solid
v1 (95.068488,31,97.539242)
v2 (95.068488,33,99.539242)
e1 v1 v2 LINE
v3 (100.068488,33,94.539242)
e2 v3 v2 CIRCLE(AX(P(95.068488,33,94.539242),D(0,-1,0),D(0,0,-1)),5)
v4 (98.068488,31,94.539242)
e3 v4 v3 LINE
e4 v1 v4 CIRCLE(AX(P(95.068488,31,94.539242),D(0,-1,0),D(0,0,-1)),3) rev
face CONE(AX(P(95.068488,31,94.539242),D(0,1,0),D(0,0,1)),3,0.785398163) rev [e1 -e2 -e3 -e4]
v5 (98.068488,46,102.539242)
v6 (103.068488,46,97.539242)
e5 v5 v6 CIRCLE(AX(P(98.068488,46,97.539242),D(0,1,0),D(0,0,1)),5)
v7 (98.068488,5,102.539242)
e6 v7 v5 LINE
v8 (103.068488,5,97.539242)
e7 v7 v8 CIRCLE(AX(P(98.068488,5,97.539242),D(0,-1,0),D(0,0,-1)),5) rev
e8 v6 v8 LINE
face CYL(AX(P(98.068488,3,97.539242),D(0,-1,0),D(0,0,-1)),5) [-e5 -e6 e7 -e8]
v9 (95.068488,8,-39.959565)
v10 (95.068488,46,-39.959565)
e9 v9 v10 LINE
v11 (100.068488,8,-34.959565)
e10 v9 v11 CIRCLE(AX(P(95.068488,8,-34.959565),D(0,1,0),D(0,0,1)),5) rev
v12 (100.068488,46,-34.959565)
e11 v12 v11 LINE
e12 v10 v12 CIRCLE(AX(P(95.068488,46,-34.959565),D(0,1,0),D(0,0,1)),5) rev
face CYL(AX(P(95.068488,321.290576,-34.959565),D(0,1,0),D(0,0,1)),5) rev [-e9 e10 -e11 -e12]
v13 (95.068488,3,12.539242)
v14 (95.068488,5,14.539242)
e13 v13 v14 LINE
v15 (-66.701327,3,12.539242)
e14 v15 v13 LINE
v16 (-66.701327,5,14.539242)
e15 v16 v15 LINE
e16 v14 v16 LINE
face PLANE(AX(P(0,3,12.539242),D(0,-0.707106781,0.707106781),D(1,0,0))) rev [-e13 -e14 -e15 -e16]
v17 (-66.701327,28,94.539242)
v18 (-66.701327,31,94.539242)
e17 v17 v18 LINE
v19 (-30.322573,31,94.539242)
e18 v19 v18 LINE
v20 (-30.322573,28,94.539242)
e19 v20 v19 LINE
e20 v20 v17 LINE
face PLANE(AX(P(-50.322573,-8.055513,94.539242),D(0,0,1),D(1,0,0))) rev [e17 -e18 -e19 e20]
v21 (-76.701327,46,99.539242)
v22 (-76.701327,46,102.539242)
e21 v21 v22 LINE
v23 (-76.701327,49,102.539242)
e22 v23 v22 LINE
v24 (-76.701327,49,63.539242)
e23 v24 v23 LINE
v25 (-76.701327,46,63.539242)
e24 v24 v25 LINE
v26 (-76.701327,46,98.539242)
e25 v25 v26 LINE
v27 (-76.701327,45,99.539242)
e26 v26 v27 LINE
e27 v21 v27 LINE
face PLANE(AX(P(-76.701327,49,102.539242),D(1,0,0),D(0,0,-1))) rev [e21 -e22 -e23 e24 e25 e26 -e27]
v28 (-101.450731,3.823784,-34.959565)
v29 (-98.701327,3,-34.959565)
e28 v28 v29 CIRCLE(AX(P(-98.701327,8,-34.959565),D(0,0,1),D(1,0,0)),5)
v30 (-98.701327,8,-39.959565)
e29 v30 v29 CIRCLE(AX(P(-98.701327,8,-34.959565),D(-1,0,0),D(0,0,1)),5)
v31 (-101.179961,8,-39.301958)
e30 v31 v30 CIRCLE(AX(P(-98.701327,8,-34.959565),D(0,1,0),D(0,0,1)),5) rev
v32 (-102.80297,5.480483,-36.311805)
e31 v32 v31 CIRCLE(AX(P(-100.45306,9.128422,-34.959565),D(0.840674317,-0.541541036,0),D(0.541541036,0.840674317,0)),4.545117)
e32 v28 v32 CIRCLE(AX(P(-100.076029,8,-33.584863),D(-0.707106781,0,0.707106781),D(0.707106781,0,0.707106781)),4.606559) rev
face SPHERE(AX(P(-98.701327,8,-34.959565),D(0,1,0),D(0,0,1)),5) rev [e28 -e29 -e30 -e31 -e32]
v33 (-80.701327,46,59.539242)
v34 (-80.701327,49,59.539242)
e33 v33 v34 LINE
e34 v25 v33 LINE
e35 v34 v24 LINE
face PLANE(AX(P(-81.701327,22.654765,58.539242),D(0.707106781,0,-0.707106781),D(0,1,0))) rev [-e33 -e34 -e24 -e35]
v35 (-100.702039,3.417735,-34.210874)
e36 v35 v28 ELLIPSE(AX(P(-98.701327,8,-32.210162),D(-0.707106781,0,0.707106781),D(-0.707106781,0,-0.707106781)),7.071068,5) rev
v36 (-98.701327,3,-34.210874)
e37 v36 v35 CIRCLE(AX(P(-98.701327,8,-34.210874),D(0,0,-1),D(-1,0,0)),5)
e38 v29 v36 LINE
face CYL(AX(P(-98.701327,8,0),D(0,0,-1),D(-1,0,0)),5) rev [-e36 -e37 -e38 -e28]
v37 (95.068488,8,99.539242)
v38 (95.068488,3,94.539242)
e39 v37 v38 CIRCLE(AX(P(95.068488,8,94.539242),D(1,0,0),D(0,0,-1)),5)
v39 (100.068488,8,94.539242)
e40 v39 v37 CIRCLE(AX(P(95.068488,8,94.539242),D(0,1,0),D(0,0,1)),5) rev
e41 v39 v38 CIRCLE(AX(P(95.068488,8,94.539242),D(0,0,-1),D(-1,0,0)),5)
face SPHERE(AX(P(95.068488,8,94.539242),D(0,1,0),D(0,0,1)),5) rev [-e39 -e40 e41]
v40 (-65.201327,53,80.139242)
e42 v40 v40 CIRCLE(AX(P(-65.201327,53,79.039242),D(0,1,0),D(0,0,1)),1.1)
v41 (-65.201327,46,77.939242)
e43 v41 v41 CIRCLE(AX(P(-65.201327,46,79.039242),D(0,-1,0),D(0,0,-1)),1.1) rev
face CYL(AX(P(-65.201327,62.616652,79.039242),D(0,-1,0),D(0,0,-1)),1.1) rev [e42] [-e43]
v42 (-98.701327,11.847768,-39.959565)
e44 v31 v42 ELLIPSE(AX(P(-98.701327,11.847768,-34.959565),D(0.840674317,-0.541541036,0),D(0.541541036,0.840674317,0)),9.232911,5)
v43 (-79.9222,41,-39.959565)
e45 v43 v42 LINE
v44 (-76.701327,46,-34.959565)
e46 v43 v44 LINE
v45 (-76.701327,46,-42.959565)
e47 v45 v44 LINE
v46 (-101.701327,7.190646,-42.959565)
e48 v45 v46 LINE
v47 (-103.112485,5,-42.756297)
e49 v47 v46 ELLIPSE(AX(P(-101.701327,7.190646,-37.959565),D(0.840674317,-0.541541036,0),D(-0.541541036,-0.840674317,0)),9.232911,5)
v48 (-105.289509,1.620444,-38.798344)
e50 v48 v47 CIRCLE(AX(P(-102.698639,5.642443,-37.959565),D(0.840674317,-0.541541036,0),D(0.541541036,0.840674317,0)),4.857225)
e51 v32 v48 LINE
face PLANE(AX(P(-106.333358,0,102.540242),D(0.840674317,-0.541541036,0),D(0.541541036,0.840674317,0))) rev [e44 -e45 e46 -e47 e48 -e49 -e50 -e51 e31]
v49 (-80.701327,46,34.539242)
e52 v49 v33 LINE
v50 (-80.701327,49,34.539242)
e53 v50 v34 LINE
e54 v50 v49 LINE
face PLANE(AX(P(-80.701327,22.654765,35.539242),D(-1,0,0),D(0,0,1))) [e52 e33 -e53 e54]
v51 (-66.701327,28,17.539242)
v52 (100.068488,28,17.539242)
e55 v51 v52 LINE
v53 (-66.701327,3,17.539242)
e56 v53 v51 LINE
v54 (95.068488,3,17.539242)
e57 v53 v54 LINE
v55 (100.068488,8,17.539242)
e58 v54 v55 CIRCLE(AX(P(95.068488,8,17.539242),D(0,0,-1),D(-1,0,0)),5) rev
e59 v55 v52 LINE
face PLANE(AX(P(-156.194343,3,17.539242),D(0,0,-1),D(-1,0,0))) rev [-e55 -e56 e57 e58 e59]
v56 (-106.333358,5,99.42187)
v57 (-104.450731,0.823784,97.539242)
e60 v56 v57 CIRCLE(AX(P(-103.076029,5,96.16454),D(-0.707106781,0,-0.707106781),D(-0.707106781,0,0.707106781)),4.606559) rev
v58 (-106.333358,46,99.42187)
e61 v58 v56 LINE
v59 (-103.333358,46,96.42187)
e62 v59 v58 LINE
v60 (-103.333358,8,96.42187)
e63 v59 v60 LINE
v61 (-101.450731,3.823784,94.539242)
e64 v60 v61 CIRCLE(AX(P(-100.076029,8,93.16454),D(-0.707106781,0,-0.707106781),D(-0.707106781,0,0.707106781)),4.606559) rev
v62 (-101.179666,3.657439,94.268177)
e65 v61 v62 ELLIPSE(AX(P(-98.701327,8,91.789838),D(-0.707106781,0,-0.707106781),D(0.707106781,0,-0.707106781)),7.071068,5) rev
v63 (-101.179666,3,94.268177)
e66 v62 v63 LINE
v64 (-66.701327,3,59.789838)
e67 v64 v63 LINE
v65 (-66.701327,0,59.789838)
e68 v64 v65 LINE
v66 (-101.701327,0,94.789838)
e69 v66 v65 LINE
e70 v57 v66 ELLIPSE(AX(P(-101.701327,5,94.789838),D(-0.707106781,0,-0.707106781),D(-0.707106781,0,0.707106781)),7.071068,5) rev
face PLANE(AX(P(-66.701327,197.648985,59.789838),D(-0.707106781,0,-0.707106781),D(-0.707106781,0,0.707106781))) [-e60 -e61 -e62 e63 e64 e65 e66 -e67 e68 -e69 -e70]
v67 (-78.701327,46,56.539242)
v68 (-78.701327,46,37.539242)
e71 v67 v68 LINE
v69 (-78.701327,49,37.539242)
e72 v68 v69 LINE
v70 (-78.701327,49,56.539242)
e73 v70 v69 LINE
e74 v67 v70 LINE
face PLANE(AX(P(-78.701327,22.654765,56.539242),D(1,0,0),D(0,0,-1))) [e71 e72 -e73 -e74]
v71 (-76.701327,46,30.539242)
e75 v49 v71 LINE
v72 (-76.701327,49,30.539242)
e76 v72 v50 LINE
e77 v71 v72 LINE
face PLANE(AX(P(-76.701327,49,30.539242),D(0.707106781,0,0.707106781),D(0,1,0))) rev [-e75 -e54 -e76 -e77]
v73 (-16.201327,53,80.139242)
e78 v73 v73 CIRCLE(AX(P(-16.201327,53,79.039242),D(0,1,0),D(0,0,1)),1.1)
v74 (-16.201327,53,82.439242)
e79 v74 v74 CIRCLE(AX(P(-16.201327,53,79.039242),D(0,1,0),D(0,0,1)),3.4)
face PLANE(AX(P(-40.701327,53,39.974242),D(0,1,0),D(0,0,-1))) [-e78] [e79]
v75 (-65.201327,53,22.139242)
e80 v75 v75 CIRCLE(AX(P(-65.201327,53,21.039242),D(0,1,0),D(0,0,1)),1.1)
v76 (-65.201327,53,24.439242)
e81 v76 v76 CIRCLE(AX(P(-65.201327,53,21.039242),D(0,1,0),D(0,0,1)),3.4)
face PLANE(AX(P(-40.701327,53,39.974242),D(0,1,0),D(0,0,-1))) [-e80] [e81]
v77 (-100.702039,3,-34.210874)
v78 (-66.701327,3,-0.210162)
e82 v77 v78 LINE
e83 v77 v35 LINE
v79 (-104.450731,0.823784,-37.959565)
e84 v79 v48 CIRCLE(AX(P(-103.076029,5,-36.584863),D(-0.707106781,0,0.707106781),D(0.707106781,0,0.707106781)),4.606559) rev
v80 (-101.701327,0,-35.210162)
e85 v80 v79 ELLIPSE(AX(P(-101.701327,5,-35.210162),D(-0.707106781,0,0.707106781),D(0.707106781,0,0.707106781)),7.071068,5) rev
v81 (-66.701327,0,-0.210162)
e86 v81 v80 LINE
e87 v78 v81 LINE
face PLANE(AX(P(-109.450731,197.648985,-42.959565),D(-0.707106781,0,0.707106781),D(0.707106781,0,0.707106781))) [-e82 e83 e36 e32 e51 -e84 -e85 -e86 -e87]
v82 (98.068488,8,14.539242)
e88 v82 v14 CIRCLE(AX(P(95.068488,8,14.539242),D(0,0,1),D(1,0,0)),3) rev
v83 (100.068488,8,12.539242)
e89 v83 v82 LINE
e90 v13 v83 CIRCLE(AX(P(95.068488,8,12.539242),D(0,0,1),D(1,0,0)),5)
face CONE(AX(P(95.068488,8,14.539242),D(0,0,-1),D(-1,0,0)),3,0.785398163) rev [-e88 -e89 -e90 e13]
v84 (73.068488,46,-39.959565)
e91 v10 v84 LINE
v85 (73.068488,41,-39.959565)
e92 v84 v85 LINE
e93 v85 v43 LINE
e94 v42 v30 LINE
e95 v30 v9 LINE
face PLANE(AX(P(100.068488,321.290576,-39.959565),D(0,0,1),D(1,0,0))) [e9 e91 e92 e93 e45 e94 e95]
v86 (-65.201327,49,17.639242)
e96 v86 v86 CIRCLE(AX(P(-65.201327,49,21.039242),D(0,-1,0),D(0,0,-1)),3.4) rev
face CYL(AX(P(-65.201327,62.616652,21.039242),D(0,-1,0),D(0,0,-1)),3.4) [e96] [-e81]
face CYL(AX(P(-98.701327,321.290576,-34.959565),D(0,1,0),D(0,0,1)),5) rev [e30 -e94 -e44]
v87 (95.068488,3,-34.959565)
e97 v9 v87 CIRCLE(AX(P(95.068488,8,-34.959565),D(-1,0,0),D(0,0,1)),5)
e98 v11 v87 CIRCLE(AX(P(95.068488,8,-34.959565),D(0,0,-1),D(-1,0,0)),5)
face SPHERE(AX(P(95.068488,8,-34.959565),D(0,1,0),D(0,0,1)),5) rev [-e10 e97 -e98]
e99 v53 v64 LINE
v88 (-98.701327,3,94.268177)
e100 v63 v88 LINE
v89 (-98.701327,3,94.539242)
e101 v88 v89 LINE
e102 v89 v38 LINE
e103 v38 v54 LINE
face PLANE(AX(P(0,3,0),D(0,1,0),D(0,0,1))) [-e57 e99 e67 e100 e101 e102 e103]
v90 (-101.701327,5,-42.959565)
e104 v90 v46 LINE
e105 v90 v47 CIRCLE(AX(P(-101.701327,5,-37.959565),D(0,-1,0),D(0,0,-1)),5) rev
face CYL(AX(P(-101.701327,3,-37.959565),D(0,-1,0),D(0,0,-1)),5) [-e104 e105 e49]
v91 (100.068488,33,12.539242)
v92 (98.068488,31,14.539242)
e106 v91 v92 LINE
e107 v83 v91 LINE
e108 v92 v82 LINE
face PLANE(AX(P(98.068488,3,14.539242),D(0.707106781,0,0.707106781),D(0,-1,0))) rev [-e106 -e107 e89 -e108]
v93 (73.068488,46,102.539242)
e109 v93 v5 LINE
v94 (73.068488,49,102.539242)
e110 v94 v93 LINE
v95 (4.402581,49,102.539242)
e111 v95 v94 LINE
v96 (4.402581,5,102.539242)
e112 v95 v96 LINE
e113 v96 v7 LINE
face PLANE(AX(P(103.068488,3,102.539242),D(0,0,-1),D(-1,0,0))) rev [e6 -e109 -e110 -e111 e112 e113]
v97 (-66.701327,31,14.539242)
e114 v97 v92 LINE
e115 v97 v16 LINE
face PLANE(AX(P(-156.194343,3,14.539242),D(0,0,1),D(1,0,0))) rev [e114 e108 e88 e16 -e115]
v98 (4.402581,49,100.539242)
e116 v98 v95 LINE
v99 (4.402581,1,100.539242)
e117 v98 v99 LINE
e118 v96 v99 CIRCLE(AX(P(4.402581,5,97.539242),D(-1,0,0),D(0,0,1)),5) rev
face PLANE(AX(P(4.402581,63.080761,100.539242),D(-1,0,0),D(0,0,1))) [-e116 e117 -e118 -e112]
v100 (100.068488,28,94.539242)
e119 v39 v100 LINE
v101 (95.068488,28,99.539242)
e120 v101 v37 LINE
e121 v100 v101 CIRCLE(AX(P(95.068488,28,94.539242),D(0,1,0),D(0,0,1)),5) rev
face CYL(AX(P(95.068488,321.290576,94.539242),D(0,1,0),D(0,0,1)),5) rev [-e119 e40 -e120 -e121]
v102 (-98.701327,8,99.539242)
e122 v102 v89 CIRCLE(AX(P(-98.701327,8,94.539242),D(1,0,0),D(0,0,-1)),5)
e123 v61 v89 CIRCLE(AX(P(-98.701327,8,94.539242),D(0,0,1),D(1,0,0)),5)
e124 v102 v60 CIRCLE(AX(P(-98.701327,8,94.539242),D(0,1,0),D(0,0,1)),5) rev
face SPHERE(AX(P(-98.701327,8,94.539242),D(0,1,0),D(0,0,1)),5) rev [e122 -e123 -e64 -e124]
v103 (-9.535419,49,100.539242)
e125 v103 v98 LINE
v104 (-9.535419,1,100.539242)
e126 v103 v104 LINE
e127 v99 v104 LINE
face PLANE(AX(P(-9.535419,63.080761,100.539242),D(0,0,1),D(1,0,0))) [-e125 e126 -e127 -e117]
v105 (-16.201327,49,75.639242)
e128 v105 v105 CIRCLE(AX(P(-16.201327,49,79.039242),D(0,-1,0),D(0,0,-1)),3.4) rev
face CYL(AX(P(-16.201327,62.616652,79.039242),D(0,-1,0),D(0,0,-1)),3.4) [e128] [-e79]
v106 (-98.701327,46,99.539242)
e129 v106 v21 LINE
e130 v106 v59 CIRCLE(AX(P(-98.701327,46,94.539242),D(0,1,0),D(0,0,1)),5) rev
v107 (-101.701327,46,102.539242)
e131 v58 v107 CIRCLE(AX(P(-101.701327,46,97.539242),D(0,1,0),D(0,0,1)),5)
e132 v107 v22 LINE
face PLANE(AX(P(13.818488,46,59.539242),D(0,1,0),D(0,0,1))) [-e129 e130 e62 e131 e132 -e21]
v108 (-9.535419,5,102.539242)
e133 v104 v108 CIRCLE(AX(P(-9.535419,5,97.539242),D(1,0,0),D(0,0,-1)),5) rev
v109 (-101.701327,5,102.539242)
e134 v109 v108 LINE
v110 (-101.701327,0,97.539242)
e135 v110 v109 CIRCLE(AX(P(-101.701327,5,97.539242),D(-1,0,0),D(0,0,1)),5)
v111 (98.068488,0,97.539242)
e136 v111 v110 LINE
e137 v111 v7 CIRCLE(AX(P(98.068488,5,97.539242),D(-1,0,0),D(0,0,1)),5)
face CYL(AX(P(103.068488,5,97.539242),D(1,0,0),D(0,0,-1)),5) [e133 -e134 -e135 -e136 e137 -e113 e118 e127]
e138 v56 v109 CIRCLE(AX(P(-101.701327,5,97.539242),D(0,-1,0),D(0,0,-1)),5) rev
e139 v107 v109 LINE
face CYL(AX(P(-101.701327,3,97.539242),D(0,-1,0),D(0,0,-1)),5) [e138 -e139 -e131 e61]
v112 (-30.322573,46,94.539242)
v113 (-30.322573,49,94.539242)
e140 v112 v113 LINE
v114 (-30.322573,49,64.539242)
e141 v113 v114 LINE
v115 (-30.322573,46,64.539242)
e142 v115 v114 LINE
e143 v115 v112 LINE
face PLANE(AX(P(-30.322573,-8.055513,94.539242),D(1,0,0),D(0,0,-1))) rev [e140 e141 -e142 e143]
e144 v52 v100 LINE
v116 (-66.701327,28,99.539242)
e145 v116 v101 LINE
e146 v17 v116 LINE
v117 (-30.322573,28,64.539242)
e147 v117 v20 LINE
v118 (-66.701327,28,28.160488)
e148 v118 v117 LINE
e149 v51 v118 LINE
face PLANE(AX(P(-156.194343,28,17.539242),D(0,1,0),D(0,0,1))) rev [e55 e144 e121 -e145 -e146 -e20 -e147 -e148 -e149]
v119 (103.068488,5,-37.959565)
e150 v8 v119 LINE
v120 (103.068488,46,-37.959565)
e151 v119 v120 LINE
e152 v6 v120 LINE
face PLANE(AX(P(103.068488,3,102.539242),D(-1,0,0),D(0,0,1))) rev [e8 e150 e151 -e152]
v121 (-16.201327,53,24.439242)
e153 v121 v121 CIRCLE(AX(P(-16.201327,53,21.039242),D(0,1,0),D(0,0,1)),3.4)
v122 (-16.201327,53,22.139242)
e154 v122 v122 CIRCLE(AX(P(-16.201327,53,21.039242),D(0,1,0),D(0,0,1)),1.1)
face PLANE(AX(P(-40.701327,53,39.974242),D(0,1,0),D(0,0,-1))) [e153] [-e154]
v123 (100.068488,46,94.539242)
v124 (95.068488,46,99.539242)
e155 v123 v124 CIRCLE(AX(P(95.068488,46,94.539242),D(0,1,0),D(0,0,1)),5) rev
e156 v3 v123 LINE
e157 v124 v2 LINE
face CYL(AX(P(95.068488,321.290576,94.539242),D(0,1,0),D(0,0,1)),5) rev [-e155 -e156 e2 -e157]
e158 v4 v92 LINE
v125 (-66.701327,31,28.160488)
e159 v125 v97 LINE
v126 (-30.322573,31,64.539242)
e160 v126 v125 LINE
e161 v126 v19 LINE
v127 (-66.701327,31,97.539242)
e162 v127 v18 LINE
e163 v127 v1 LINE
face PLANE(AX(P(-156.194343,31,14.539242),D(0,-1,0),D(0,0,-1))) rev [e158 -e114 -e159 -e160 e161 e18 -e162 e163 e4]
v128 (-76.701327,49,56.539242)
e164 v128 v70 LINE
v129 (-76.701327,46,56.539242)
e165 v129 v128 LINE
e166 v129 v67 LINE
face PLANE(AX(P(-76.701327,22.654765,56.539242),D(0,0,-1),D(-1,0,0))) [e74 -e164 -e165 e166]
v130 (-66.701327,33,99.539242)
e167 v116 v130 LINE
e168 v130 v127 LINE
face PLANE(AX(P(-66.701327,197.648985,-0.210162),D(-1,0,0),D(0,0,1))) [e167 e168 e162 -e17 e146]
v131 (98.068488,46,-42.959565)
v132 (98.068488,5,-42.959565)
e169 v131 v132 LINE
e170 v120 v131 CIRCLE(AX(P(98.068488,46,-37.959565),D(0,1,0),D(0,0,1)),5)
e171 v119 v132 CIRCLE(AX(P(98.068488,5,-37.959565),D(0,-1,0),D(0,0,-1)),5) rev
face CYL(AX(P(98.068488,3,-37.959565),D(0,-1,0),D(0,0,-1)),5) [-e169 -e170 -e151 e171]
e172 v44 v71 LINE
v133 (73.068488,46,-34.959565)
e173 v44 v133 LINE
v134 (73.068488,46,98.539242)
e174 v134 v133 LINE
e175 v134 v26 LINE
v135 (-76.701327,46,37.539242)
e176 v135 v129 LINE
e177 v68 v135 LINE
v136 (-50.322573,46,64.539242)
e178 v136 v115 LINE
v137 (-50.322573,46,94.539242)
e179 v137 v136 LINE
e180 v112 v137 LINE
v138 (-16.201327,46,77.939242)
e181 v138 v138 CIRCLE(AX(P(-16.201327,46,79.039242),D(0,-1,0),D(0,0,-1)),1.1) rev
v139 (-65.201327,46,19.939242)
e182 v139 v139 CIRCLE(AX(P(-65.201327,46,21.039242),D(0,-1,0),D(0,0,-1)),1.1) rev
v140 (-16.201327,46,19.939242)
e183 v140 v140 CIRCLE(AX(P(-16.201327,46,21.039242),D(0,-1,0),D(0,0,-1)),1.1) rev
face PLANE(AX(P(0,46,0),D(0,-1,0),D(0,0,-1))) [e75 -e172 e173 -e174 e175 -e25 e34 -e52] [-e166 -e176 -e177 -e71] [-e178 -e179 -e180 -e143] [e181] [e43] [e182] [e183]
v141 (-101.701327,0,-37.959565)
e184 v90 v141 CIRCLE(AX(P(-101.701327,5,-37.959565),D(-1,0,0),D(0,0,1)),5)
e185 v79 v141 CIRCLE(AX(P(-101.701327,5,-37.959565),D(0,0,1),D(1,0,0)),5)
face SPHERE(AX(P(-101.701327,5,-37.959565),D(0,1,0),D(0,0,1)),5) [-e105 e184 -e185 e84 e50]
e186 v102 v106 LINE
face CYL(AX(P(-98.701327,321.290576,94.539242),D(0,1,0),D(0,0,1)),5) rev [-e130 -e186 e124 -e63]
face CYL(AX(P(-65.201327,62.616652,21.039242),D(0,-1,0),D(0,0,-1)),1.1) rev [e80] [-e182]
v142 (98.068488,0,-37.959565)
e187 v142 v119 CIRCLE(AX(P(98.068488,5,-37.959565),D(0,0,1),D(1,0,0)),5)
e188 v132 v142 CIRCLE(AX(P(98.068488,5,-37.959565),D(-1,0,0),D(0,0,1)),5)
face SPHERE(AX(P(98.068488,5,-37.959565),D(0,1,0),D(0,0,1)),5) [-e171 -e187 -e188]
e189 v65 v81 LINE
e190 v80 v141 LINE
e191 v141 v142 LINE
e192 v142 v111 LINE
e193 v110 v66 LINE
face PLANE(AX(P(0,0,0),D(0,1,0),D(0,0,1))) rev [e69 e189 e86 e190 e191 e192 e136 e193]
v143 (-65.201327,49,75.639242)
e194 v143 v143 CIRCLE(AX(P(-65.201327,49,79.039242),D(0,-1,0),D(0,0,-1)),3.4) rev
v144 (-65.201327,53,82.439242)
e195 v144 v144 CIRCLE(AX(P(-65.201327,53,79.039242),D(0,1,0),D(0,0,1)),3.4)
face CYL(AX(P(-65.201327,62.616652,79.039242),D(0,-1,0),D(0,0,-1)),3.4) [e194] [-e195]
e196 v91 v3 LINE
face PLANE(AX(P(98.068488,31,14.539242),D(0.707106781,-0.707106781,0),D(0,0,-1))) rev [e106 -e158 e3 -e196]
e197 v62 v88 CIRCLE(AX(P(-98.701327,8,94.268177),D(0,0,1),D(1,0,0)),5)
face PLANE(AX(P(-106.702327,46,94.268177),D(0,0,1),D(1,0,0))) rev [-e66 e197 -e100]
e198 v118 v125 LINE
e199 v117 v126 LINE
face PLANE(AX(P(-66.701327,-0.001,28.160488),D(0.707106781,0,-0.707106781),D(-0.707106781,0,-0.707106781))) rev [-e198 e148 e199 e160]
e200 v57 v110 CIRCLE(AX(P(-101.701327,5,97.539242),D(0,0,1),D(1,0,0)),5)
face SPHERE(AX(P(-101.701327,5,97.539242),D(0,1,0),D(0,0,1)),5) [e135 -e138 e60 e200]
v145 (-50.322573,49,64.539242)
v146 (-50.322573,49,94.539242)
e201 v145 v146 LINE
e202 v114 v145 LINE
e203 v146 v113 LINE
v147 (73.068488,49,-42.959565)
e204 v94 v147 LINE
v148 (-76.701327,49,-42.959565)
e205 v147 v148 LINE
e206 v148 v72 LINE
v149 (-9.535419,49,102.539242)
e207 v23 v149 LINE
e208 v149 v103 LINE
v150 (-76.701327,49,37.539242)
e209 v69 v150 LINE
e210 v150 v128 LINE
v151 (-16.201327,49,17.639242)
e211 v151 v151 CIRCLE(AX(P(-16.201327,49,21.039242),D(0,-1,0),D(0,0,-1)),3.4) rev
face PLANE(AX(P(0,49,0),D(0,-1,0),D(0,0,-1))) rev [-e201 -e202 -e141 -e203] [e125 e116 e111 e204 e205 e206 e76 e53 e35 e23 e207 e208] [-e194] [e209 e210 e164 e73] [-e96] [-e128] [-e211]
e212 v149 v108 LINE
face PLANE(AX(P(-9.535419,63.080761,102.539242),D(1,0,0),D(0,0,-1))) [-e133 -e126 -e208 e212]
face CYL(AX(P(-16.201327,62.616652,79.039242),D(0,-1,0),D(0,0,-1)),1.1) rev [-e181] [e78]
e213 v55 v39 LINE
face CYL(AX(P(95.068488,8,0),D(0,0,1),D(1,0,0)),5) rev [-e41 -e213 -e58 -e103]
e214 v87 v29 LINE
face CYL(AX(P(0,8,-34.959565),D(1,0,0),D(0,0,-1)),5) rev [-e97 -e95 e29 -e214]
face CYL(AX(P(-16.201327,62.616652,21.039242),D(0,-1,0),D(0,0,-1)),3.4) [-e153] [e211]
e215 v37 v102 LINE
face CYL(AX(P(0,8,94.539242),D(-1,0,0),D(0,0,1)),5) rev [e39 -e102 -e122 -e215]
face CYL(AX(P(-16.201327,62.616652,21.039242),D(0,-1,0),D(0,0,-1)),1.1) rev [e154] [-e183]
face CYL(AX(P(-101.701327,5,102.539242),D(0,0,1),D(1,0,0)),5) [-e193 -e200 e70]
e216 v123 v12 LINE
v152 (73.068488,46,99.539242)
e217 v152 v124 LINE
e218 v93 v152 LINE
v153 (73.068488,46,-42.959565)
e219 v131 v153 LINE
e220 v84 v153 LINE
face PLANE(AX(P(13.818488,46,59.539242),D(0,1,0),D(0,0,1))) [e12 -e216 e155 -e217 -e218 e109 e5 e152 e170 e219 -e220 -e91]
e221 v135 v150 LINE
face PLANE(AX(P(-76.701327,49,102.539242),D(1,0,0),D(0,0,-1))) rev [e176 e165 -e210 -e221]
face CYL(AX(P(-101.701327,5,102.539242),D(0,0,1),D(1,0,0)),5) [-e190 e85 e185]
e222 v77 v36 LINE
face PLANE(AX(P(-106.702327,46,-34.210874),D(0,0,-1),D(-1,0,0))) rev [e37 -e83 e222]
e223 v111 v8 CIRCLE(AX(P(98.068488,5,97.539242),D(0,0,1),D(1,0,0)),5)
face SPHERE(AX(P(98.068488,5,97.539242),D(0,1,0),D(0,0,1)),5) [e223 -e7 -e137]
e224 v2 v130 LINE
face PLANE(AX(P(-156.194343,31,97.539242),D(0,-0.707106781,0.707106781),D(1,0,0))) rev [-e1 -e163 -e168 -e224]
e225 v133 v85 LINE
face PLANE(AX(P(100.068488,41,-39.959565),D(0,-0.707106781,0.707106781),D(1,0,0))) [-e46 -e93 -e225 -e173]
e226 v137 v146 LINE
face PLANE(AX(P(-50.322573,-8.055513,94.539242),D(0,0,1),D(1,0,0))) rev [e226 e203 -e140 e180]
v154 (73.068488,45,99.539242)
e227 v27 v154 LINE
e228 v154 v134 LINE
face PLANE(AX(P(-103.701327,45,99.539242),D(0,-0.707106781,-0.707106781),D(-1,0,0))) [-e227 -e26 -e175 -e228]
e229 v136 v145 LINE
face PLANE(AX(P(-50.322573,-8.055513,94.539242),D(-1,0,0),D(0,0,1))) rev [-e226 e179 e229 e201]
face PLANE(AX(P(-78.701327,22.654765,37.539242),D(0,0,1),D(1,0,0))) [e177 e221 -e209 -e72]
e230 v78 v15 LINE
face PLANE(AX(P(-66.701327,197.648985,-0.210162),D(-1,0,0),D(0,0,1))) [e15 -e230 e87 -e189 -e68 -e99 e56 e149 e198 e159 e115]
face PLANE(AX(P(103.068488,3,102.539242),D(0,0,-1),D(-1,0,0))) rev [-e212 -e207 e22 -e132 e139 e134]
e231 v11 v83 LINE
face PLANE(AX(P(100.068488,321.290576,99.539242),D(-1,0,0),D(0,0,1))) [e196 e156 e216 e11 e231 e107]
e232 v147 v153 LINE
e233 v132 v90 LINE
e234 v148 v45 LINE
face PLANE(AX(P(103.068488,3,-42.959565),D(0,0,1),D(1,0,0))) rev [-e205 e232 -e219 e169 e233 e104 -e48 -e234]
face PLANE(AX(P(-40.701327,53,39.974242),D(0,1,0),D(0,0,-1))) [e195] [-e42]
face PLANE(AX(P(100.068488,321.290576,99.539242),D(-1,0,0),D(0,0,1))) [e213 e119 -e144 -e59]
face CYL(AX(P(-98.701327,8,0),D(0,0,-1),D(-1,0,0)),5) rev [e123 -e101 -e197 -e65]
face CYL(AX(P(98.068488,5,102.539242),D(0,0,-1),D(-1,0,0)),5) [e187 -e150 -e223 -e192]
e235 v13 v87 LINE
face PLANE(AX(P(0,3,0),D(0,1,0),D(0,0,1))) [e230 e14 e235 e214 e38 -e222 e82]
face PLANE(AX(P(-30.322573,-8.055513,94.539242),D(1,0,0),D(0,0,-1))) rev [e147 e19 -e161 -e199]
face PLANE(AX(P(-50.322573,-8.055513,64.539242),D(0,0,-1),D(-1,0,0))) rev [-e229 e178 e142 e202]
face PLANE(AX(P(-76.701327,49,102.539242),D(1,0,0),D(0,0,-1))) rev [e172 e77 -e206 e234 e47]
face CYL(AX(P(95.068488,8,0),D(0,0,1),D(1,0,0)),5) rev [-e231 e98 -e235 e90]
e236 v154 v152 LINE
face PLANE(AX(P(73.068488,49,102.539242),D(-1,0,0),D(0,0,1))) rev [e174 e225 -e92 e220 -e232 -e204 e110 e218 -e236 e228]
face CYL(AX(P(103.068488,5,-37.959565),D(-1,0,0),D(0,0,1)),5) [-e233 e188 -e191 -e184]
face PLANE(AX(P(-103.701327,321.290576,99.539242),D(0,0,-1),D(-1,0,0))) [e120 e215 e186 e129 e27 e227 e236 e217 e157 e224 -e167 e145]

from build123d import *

# Parameters (mm, degrees)
SKETCH1_W           = 209.76981502
SKETCH1_H           = 145.49880751
BOSS_EXTRUDE1_DEPTH = 3
SKETCH2_W           = 209.76981502
SKETCH2_H           = 145.49880751
SKETCH2_W_2         = 203.76981502
SKETCH2_H_2         = 139.49880751
BOSS_EXTRUDE2_DEPTH = 43
CUT_EXTRUDE1_REACH  = 237.338
SKETCH3_W           = 128.479051628
SKETCH3_H           = 43
FILLET1_R           = 5
FILLET2_R           = 5
SKETCH4_W           = 149.76981502
SKETCH4_H           = 145.49880751
BOSS_EXTRUDE3_DEPTH = 3
SKETCH6_R           = 3.4
SKETCH6_R_2         = 1.1
BOSS_EXTRUDE4_DEPTH = 4
CUT_EXTRUDE3_REACH  = 159.189
CUT_EXTRUDE4_REACH  = 157.634
SKETCH6_3_R         = 1.1
SKETCH10_W          = 13.938
SKETCH10_H          = 2
CUT_EXTRUDE7_DEPTH  = 49
BOSS_EXTRUDE7_DEPTH = 3
CHAMFER2_SIZE       = 5
BOSS_EXTRUDE8_DEPTH = 166.769815019
CUT_EXTRUDE8_REACH  = 189.845
CHAMFER3_SIZE       = 5
CHAMFER4_SIZE       = 1
CUT_EXTRUDE9_REACH  = 157.634
SKETCH14_W          = 20
SKETCH14_H          = 30
CHAMFER5_SIZE       = 2
CUT_EXTRUDE11_REACH = 152.937


with BuildPart() as part:
    # Sketch1 → Boss-Extrude1 (new body)
    with BuildSketch(Plane(origin=(0, 0, 0), x_dir=(1, 0, 0), z_dir=(0, 1, 0))):
        with Locations((-1.81641925, -29.789838466)):
            Rectangle(SKETCH1_W, SKETCH1_H)
    extrude(amount=BOSS_EXTRUDE1_DEPTH)

    # Sketch2 → Boss-Extrude2 (add)
    with BuildSketch(Plane(origin=(0, 3, 0), x_dir=(1, 0, 0), z_dir=(0, 1, 0))):
        with Locations((-1.81641925, -29.789838466)):
            Rectangle(SKETCH2_W, SKETCH2_H)
        with Locations((-1.81641925, -29.789838466)):
            Rectangle(SKETCH2_W_2, SKETCH2_H_2, mode=Mode.SUBTRACT)
    extrude(amount=BOSS_EXTRUDE2_DEPTH)

    # Sketch3 → Cut-Extrude1 (cut, up to next)
    with BuildSketch(Plane(origin=(-103.70132676, 0, 0), x_dir=(0, 0, -1), z_dir=(1, 0, 0)), mode=Mode.PRIVATE) as cut_extrude1_sk1:
        with Locations((-30.028651676, 24.5)):
            Rectangle(SKETCH3_W, SKETCH3_H)
    cut_extrude1_tool1 = extrude(cut_extrude1_sk1.sketch, amount=-CUT_EXTRUDE1_REACH, mode=Mode.PRIVATE) & part.part
    add(cut_extrude1_tool1.solids().sort_by_distance((-103.701327, 24.5, 30.028652))[0], mode=Mode.SUBTRACT)

    # Fillet1
    fillet1_edges = [part.edges().sort_by_distance(p)[0] for p in [
        (100.06848826, 24.5, -39.959565289),
        (100.06848826, 24.5, 99.539242221),
        (-103.70132676, 24.5, 99.539242221),
        (-103.70132676, 24.5, -39.959565289),
        (-106.70132676, 23, -42.959565289),
        (103.06848826, 23, -42.959565289),
        (103.06848826, 23, 102.539242221),
        (-106.70132676, 23, 102.539242221),
    ]]
    fillet(fillet1_edges, radius=FILLET1_R)

    # Fillet2
    # the kernel refuses this fillet: 5 mm, written as the material it adds along each edge
    with BuildSketch(Plane(origin=(-103.70132676, 3, 94.26817749), x_dir=(0, 1, 0), z_dir=(0, 0, 1))) as fillet2_piece_1:
        with BuildLine():
            CenterArc((FILLET2_R, -FILLET2_R), FILLET2_R, 90, 90)
            Line((0, -FILLET2_R), (0, 0))
            Line((0, 0), (FILLET2_R, 0))
        make_face()
    extrude(amount=0.271064731)
    with BuildSketch(Plane(origin=(-98.70132676, 3, 94.539242221), x_dir=(-1, 0, 0), z_dir=(0, 0, -1))) as fillet2_piece_2:
        with BuildLine():
            CenterArc((5 - FILLET2_R, FILLET2_R), FILLET2_R, 270, 90)
            Line((5 - FILLET2_R, 0), (5, 0))
            Line((5, 0), (5, FILLET2_R))
        make_face()
    revolve(axis=Axis((-98.70132676, 3, 94.539242221), (0, 1, 0)), revolution_arc=90)
    with BuildSketch(Plane(origin=(-98.70132676, 3, 99.539242221), x_dir=(0, 1, 0), z_dir=(1, 0, 0)), Plane(origin=(95.06848826, 3, -39.959565289), x_dir=(0, 1, 0), z_dir=(-1, 0, 0))) as fillet2_piece_3:
        with BuildLine():
            CenterArc((FILLET2_R, -FILLET2_R), FILLET2_R, 90, 90)
            Line((0, -FILLET2_R), (0, 0))
            Line((0, 0), (FILLET2_R, 0))
        make_face()
    extrude(amount=193.769815019)
    with BuildSketch(Plane(origin=(95.06848826, 3, 94.539242221), x_dir=(0, 0, 1), z_dir=(-1, 0, 0))) as fillet2_piece_4:
        with BuildLine():
            CenterArc((5 - FILLET2_R, FILLET2_R), FILLET2_R, 270, 90)
            Line((5 - FILLET2_R, 0), (5, 0))
            Line((5, 0), (5, FILLET2_R))
        make_face()
    revolve(axis=Axis((95.06848826, 3, 94.539242221), (0, 1, 0)), revolution_arc=90)
    with BuildSketch(Plane(origin=(100.06848826, 3, 94.539242221), x_dir=(0, 1, 0), z_dir=(0, 0, -1))) as fillet2_piece_5:
        with BuildLine():
            CenterArc((FILLET2_R, -FILLET2_R), FILLET2_R, 90, 90)
            Line((0, -FILLET2_R), (0, 0))
            Line((0, 0), (FILLET2_R, 0))
        make_face()
    extrude(amount=129.49880751)
    with BuildSketch(Plane(origin=(95.06848826, 3, -34.959565289), x_dir=(1, 0, 0), z_dir=(0, 0, 1))) as fillet2_piece_6:
        with BuildLine():
            CenterArc((5 - FILLET2_R, FILLET2_R), FILLET2_R, 270, 90)
            Line((5 - FILLET2_R, 0), (5, 0))
            Line((5, 0), (5, FILLET2_R))
        make_face()
    revolve(axis=Axis((95.06848826, 3, -34.959565289), (0, 1, 0)), revolution_arc=90)
    with BuildSketch(Plane(origin=(-103.70132676, 3, -34.959565289), x_dir=(0, 1, 0), z_dir=(0, 0, 1))) as fillet2_piece_7:
        with BuildLine():
            CenterArc((FILLET2_R, -FILLET2_R), FILLET2_R, 90, 90)
            Line((0, -FILLET2_R), (0, 0))
            Line((0, 0), (FILLET2_R, 0))
        make_face()
    extrude(amount=0.748691151)
    with BuildSketch(Plane(origin=(-98.70132676, 3, -34.959565289), x_dir=(0, 0, -1), z_dir=(1, 0, 0))) as fillet2_piece_8:
        with BuildLine():
            CenterArc((5 - FILLET2_R, FILLET2_R), FILLET2_R, 270, 90)
            Line((5 - FILLET2_R, 0), (5, 0))
            Line((5, 0), (5, FILLET2_R))
        make_face()
    revolve(axis=Axis((-98.70132676, 3, -34.959565289), (0, 1, 0)), revolution_arc=90)
    # the kernel refuses this fillet: 5 mm, written as the material it takes off along each edge
    with BuildSketch(Plane(origin=(-101.70132676, 0, 97.539242221), x_dir=(0, 0, 1), z_dir=(1, 0, 0))) as fillet2_2_piece_1:
        with BuildLine():
            CenterArc((5 - FILLET2_R, -FILLET2_R), FILLET2_R, 0, 90)
            Line((5, -FILLET2_R), (5, 0))
            Line((5, 0), (5 - FILLET2_R, 0))
        make_face()
    revolve(axis=Axis((-101.70132676, 0, 97.539242221), (0, -1, 0)), revolution_arc=90, mode=Mode.SUBTRACT)
    with BuildSketch(Plane(origin=(-106.70132676, 0, 97.539242221), x_dir=(1, 0, 0), z_dir=(0, 0, -1)), Plane(origin=(103.06848826, 0, -37.959565289), x_dir=(-1, 0, 0), z_dir=(0, 0, 1))) as fillet2_2_piece_2:
        with BuildLine():
            CenterArc((FILLET2_R, -FILLET2_R), FILLET2_R, 90, 90)
            Line((0, -FILLET2_R), (0, 0))
            Line((0, 0), (FILLET2_R, 0))
        make_face()
    extrude(amount=135.49880751, mode=Mode.SUBTRACT)
    with BuildSketch(Plane(origin=(-101.70132676, 0, -37.959565289), x_dir=(-1, 0, 0), z_dir=(0, 0, 1))) as fillet2_2_piece_3:
        with BuildLine():
            CenterArc((5 - FILLET2_R, -FILLET2_R), FILLET2_R, 0, 90)
            Line((5, -FILLET2_R), (5, 0))
            Line((5, 0), (5 - FILLET2_R, 0))
        make_face()
    revolve(axis=Axis((-101.70132676, 0, -37.959565289), (0, -1, 0)), revolution_arc=90, mode=Mode.SUBTRACT)
    with BuildSketch(Plane(origin=(-101.70132676, 0, -42.959565289), x_dir=(0, 0, 1), z_dir=(1, 0, 0))) as fillet2_2_piece_4:
        with BuildLine():
            CenterArc((FILLET2_R, -FILLET2_R), FILLET2_R, 90, 90)
            Line((0, -FILLET2_R), (0, 0))
            Line((0, 0), (FILLET2_R, 0))
        make_face()
    extrude(amount=199.769815019, mode=Mode.SUBTRACT)
    with BuildSketch(Plane(origin=(98.06848826, 0, -37.959565289), x_dir=(1, 0, 0), z_dir=(0, 0, 1))) as fillet2_2_piece_5:
        with BuildLine():
            CenterArc((5 - FILLET2_R, FILLET2_R), FILLET2_R, 270, 90)
            Line((5, FILLET2_R), (5, 0))
            Line((5, 0), (5 - FILLET2_R, 0))
        make_face()
    revolve(axis=Axis((98.06848826, 0, -37.959565289), (0, 1, 0)), revolution_arc=90, mode=Mode.SUBTRACT)
    with BuildSketch(Plane(origin=(98.06848826, 0, 97.539242221), x_dir=(0, 0, 1), z_dir=(-1, 0, 0))) as fillet2_2_piece_6:
        with BuildLine():
            CenterArc((5 - FILLET2_R, FILLET2_R), FILLET2_R, 270, 90)
            Line((5, FILLET2_R), (5, 0))
            Line((5, 0), (5 - FILLET2_R, 0))
        make_face()
    revolve(axis=Axis((98.06848826, 0, 97.539242221), (0, 1, 0)), revolution_arc=90, mode=Mode.SUBTRACT)
    with BuildSketch(Plane(origin=(98.06848826, 0, 102.539242221), x_dir=(0, 1, 0), z_dir=(-1, 0, 0))) as fillet2_2_piece_7:
        with BuildLine():
            CenterArc((FILLET2_R, FILLET2_R), FILLET2_R, 180, 90)
            Line((0, FILLET2_R), (0, 0))
            Line((0, 0), (FILLET2_R, 0))
        make_face()
    extrude(amount=199.769815019, mode=Mode.SUBTRACT)

    # Sketch4 → Boss-Extrude3 (add)
    with BuildSketch(Plane(origin=(0, 46, 0), x_dir=(1, 0, 0), z_dir=(0, 1, 0))):
        with Locations((-1.81641925, -29.789838466)):
            Rectangle(SKETCH4_W, SKETCH4_H)
    extrude(amount=BOSS_EXTRUDE3_DEPTH)

    # Sketch6 → Boss-Extrude4 (add)
    # profile 1 of 4: a face of its own
    with BuildSketch(Plane(origin=(0, 49, 0), x_dir=(1, 0, 0), z_dir=(0, 1, 0))):
        with Locations(Location((-65.20132676, -21.039242221, 0), (0, 0, 90))):
            Circle(SKETCH6_R)
        with Locations(Location((-65.20132676, -21.039242221, 0), (0, 0, 270))):
            Circle(SKETCH6_R_2, mode=Mode.SUBTRACT)
    # profile 2 of 4: a face of its own
    with BuildSketch(Plane(origin=(0, 49, 0), x_dir=(1, 0, 0), z_dir=(0, 1, 0))):
        with Locations(Location((-65.20132676, -79.039242221, 0), (0, 0, 90))):
            Circle(SKETCH6_R)
        with Locations(Location((-65.20132676, -79.039242221, 0), (0, 0, 270))):
            Circle(SKETCH6_R_2, mode=Mode.SUBTRACT)
    # profile 3 of 4: a face of its own
    with BuildSketch(Plane(origin=(0, 49, 0), x_dir=(1, 0, 0), z_dir=(0, 1, 0))):
        with Locations(Location((-16.20132676, -21.039242221, 0), (0, 0, 90))):
            Circle(SKETCH6_R)
        with Locations(Location((-16.20132676, -21.039242221, 0), (0, 0, 270))):
            Circle(SKETCH6_R_2, mode=Mode.SUBTRACT)
    # profile 4 of 4: a face of its own
    with BuildSketch(Plane(origin=(0, 49, 0), x_dir=(1, 0, 0), z_dir=(0, 1, 0))):
        with Locations(Location((-16.20132676, -79.039242221, 0), (0, 0, 90))):
            Circle(SKETCH6_R)
        with Locations(Location((-16.20132676, -79.039242221, 0), (0, 0, 270))):
            Circle(SKETCH6_R_2, mode=Mode.SUBTRACT)
    extrude(amount=BOSS_EXTRUDE4_DEPTH)

    # Cut-Extrude3: up to this face of the body (flat: up to its plane)
    cut_extrude3_end = Plane(part.part.faces().sort_by_distance((-1.81641925, 46, 29.789838466))[0])
    # Sketch7 → Cut-Extrude3 (cut, up to the picked face)
    with BuildSketch(Plane(origin=(0, 0, 0), x_dir=(1, 0, 0), z_dir=(0, 1, 0)), mode=Mode.PRIVATE) as cut_extrude3_sk1:
        Polygon((-109.450730514, 42.959565289), (-106.825730514, 40.334565289), (-98.82632676, 32.335161534), (-66.70132676, 0.210161534), (-66.70132676, -59.789838466), (-99.07632676, -92.164838466), (-107.075730514, -100.164242221), (-109.450730514, -102.539242221), align=None)
    cut_extrude3_tool1 = split(extrude(cut_extrude3_sk1.sketch, amount=CUT_EXTRUDE3_REACH, mode=Mode.PRIVATE), bisect_by=cut_extrude3_end, keep=Keep.BOTH, mode=Mode.PRIVATE)
    add(cut_extrude3_tool1.solids().sort_by(Axis((-91.040379, 0, 29.789838), (0, 1, 0)))[0], mode=Mode.SUBTRACT)

    # Sketch6<3> → Cut-Extrude4 (cut, up to next)
    with BuildSketch(Plane(origin=(0, 49, 0), x_dir=(1, 0, 0), z_dir=(0, 1, 0)), mode=Mode.PRIVATE) as cut_extrude4_sk1:
        with Locations(Location((-65.20132676, -79.039242221, 0), (0, 0, 90))):
            Circle(SKETCH6_3_R)
    cut_extrude4_tool1 = extrude(cut_extrude4_sk1.sketch, amount=-CUT_EXTRUDE4_REACH, mode=Mode.PRIVATE) & part.part
    # Sketch6<3> → Cut-Extrude4 (cut, up to next)
    with BuildSketch(Plane(origin=(0, 49, 0), x_dir=(1, 0, 0), z_dir=(0, 1, 0)), mode=Mode.PRIVATE) as cut_extrude4_sk2:
        with Locations(Location((-65.20132676, -21.039242221, 0), (0, 0, 90))):
            Circle(SKETCH6_3_R)
    cut_extrude4_tool2 = extrude(cut_extrude4_sk2.sketch, amount=-CUT_EXTRUDE4_REACH, mode=Mode.PRIVATE) & part.part
    # Sketch6<3> → Cut-Extrude4 (cut, up to next)
    with BuildSketch(Plane(origin=(0, 49, 0), x_dir=(1, 0, 0), z_dir=(0, 1, 0)), mode=Mode.PRIVATE) as cut_extrude4_sk3:
        with Locations(Location((-16.20132676, -21.039242221, 0), (0, 0, 90))):
            Circle(SKETCH6_3_R)
    cut_extrude4_tool3 = extrude(cut_extrude4_sk3.sketch, amount=-CUT_EXTRUDE4_REACH, mode=Mode.PRIVATE) & part.part
    # Sketch6<3> → Cut-Extrude4 (cut, up to next)
    with BuildSketch(Plane(origin=(0, 49, 0), x_dir=(1, 0, 0), z_dir=(0, 1, 0)), mode=Mode.PRIVATE) as cut_extrude4_sk4:
        with Locations(Location((-16.20132676, -79.039242221, 0), (0, 0, 90))):
            Circle(SKETCH6_3_R)
    cut_extrude4_tool4 = extrude(cut_extrude4_sk4.sketch, amount=-CUT_EXTRUDE4_REACH, mode=Mode.PRIVATE) & part.part
    add(cut_extrude4_tool1.solids().sort_by_distance((-65.201327, 49, 79.039242))[0], mode=Mode.SUBTRACT)
    add(cut_extrude4_tool2.solids().sort_by_distance((-65.201327, 49, 21.039242))[0], mode=Mode.SUBTRACT)
    add(cut_extrude4_tool3.solids().sort_by_distance((-16.201327, 49, 21.039242))[0], mode=Mode.SUBTRACT)
    add(cut_extrude4_tool4.solids().sort_by_distance((-16.201327, 49, 79.039242))[0], mode=Mode.SUBTRACT)

    # Sketch10 → Cut-Extrude7 (cut)
    with BuildSketch(Plane(origin=(0, 0, 0), x_dir=(1, 0, 0), z_dir=(0, 1, 0))):
        with Locations((-2.56641925, -101.539242221)):
            Rectangle(SKETCH10_W, SKETCH10_H)
    extrude(amount=CUT_EXTRUDE7_DEPTH, mode=Mode.SUBTRACT)

    # Sketch11 → Boss-Extrude7 (add)
    with BuildSketch(Plane(origin=(0, 49, 0), x_dir=(1, 0, 0), z_dir=(0, 1, 0))):
        Polygon((-76.70132676, -35.539242221), (-80.70132676, -35.539242221), (-80.70132676, -58.539242221), (-76.70132676, -58.539242221), (-76.70132676, -56.539242221), (-78.70132676, -56.539242221), (-78.70132676, -37.539242221), (-76.70132676, -37.539242221), align=None)
    extrude(amount=-BOSS_EXTRUDE7_DEPTH)

    # Chamfer2
    # the kernel refuses this chamfer: 5 mm, written as the material it adds along each edge
    with BuildSketch(Plane(origin=(-76.70132676, 49, 35.539242221), x_dir=(0.027495876610587663, 0, -0.9996219169112968), z_dir=(0, -1, 0))) as chamfer2_piece_1_section:
        Polygon((CHAMFER2_SIZE * 0.999621916911, -CHAMFER2_SIZE * 0.0274958766106), (-CHAMFER2_SIZE * 0.0274958766106, -CHAMFER2_SIZE * 0.999621916911), (0, 0), align=None)
    chamfer2_piece_1 = extrude(amount=3, mode=Mode.PRIVATE)
    chamfer2_piece_1 = split(chamfer2_piece_1, bisect_by=Plane(origin=(-80.70132676, 47.5, 33.810650159), z_dir=(1, 0, 0)), keep=Keep.TOP, mode=Mode.PRIVATE)
    add(chamfer2_piece_1)
    with BuildSketch(Plane(origin=(-76.70132676, 49, 58.539242221), x_dir=(0.0274958766105877, 0, 0.9996219169112968), z_dir=(0, -1, 0))) as chamfer2_piece_2_section:
        Polygon((CHAMFER2_SIZE * 0.999621916911, CHAMFER2_SIZE * 0.0274958766106), (-CHAMFER2_SIZE * 0.0274958766106, CHAMFER2_SIZE * 0.999621916911), (0, 0), align=None)
    chamfer2_piece_2 = extrude(amount=3, mode=Mode.PRIVATE)
    chamfer2_piece_2 = split(chamfer2_piece_2, bisect_by=Plane(origin=(-80.70132676, 47.5, 60.267834282), z_dir=(1, 0, 0)), keep=Keep.TOP, mode=Mode.PRIVATE)
    add(chamfer2_piece_2)

    # Sketch12 → Boss-Extrude8 (add)
    with BuildSketch(Plane.ZY.offset(-100.06848826)):
        Polygon((14.539242221, 3), (14.539242221, 31), (99.539242221, 31), (99.539242221, 28), (17.539242221, 28), (17.539242221, 3), align=None)
    extrude(amount=BOSS_EXTRUDE8_DEPTH)

    # Sketch13 → Cut-Extrude8 (cut, up to next)
    with BuildSketch(Plane(origin=(0, 0, -42.959565289), x_dir=(-1, 0, 0), z_dir=(0, 0, -1)), mode=Mode.PRIVATE) as cut_extrude8_sk1:
        Polygon((76.70132676, 46), (106.333358026, 46), (106.333358026, 0), align=None)
    cut_extrude8_tool1 = extrude(cut_extrude8_sk1.sketch, amount=-CUT_EXTRUDE8_REACH, mode=Mode.PRIVATE) & part.part
    add(cut_extrude8_tool1.solids().sort_by_distance((-96.456014, 30.666667, -42.959565))[0], mode=Mode.SUBTRACT)

    # Chamfer3
    chamfer3_edges = [part.edges().sort_by_distance(p)[0] for p in [
        (-1.81641925, 46, -39.959565289),
    ]]
    chamfer(chamfer3_edges, length=CHAMFER3_SIZE)

    # Chamfer4
    # the kernel refuses this chamfer: 1 mm, written as the material it adds along each edge
    with BuildSketch(Plane(origin=(-76.70132676, 46, 99.539242221), x_dir=(0, 0.027495876610589196, -0.9996219169112968), z_dir=(1, 0, 0))) as chamfer4_piece_1:
        Polygon((CHAMFER4_SIZE * 0.999621916911, -CHAMFER4_SIZE * 0.0274958766106), (-CHAMFER4_SIZE * 0.0274958766106, -CHAMFER4_SIZE * 0.999621916911), (0, 0), align=None)
    extrude(amount=149.769815019)

    # Cut-Extrude9: up to this face of the body (flat: up to its plane)
    cut_extrude9_end = Plane(part.part.faces().sort_by_distance((16.651292548, 28, 58.523589057))[0])
    # Sketch14 → Cut-Extrude9 (cut, up to the picked face)
    with BuildSketch(Plane(origin=(0, 49, 0), x_dir=(1, 0, 0), z_dir=(0, 1, 0)), mode=Mode.PRIVATE) as cut_extrude9_sk1:
        with Locations((-40.322572785, -79.539242221)):
            Rectangle(SKETCH14_W, SKETCH14_H)
    cut_extrude9_tool1 = split(extrude(cut_extrude9_sk1.sketch, amount=-CUT_EXTRUDE9_REACH, mode=Mode.PRIVATE), bisect_by=cut_extrude9_end, keep=Keep.BOTH, mode=Mode.PRIVATE)
    add(cut_extrude9_tool1.solids().sort_by(Axis((-40.322573, 49, 79.539242), (0, -1, 0)))[0], mode=Mode.SUBTRACT)

    # Chamfer5
    chamfer5_edges = [part.edges().sort_by_distance(p)[0] for p in [
        (98.604022166, 4.464466094, 14.539242221),
        (98.604022166, 31, 98.074776126),
        (14.18358075, 31, 99.539242221),
        (100.06848826, 31, 54.539242221),
        (100.06848826, 19.5, 14.539242221),
        (14.18358075, 3, 14.539242221),
    ]]
    chamfer(chamfer5_edges, length=CHAMFER5_SIZE)

    # Sketch16 → Cut-Extrude11 (cut, up to next)
    with BuildSketch(Plane(origin=(0, 31, 0), x_dir=(1, 0, 0), z_dir=(0, 1, 0)), mode=Mode.PRIVATE) as cut_extrude11_sk1:
        Polygon((-50.322572785, -94.539242221), (-66.70132676, -94.539242221), (-66.70132676, -28.160488246), (-30.322572785, -64.539242221), (-50.322572785, -64.539242221), align=None)
    cut_extrude11_tool1 = extrude(cut_extrude11_sk1.sketch, amount=-CUT_EXTRUDE11_REACH, mode=Mode.PRIVATE) & part.part
    add(cut_extrude11_tool1.solids().sort_by_distance((-56.252713, 31, 63.972421))[0], mode=Mode.SUBTRACT)


solid = part.part
